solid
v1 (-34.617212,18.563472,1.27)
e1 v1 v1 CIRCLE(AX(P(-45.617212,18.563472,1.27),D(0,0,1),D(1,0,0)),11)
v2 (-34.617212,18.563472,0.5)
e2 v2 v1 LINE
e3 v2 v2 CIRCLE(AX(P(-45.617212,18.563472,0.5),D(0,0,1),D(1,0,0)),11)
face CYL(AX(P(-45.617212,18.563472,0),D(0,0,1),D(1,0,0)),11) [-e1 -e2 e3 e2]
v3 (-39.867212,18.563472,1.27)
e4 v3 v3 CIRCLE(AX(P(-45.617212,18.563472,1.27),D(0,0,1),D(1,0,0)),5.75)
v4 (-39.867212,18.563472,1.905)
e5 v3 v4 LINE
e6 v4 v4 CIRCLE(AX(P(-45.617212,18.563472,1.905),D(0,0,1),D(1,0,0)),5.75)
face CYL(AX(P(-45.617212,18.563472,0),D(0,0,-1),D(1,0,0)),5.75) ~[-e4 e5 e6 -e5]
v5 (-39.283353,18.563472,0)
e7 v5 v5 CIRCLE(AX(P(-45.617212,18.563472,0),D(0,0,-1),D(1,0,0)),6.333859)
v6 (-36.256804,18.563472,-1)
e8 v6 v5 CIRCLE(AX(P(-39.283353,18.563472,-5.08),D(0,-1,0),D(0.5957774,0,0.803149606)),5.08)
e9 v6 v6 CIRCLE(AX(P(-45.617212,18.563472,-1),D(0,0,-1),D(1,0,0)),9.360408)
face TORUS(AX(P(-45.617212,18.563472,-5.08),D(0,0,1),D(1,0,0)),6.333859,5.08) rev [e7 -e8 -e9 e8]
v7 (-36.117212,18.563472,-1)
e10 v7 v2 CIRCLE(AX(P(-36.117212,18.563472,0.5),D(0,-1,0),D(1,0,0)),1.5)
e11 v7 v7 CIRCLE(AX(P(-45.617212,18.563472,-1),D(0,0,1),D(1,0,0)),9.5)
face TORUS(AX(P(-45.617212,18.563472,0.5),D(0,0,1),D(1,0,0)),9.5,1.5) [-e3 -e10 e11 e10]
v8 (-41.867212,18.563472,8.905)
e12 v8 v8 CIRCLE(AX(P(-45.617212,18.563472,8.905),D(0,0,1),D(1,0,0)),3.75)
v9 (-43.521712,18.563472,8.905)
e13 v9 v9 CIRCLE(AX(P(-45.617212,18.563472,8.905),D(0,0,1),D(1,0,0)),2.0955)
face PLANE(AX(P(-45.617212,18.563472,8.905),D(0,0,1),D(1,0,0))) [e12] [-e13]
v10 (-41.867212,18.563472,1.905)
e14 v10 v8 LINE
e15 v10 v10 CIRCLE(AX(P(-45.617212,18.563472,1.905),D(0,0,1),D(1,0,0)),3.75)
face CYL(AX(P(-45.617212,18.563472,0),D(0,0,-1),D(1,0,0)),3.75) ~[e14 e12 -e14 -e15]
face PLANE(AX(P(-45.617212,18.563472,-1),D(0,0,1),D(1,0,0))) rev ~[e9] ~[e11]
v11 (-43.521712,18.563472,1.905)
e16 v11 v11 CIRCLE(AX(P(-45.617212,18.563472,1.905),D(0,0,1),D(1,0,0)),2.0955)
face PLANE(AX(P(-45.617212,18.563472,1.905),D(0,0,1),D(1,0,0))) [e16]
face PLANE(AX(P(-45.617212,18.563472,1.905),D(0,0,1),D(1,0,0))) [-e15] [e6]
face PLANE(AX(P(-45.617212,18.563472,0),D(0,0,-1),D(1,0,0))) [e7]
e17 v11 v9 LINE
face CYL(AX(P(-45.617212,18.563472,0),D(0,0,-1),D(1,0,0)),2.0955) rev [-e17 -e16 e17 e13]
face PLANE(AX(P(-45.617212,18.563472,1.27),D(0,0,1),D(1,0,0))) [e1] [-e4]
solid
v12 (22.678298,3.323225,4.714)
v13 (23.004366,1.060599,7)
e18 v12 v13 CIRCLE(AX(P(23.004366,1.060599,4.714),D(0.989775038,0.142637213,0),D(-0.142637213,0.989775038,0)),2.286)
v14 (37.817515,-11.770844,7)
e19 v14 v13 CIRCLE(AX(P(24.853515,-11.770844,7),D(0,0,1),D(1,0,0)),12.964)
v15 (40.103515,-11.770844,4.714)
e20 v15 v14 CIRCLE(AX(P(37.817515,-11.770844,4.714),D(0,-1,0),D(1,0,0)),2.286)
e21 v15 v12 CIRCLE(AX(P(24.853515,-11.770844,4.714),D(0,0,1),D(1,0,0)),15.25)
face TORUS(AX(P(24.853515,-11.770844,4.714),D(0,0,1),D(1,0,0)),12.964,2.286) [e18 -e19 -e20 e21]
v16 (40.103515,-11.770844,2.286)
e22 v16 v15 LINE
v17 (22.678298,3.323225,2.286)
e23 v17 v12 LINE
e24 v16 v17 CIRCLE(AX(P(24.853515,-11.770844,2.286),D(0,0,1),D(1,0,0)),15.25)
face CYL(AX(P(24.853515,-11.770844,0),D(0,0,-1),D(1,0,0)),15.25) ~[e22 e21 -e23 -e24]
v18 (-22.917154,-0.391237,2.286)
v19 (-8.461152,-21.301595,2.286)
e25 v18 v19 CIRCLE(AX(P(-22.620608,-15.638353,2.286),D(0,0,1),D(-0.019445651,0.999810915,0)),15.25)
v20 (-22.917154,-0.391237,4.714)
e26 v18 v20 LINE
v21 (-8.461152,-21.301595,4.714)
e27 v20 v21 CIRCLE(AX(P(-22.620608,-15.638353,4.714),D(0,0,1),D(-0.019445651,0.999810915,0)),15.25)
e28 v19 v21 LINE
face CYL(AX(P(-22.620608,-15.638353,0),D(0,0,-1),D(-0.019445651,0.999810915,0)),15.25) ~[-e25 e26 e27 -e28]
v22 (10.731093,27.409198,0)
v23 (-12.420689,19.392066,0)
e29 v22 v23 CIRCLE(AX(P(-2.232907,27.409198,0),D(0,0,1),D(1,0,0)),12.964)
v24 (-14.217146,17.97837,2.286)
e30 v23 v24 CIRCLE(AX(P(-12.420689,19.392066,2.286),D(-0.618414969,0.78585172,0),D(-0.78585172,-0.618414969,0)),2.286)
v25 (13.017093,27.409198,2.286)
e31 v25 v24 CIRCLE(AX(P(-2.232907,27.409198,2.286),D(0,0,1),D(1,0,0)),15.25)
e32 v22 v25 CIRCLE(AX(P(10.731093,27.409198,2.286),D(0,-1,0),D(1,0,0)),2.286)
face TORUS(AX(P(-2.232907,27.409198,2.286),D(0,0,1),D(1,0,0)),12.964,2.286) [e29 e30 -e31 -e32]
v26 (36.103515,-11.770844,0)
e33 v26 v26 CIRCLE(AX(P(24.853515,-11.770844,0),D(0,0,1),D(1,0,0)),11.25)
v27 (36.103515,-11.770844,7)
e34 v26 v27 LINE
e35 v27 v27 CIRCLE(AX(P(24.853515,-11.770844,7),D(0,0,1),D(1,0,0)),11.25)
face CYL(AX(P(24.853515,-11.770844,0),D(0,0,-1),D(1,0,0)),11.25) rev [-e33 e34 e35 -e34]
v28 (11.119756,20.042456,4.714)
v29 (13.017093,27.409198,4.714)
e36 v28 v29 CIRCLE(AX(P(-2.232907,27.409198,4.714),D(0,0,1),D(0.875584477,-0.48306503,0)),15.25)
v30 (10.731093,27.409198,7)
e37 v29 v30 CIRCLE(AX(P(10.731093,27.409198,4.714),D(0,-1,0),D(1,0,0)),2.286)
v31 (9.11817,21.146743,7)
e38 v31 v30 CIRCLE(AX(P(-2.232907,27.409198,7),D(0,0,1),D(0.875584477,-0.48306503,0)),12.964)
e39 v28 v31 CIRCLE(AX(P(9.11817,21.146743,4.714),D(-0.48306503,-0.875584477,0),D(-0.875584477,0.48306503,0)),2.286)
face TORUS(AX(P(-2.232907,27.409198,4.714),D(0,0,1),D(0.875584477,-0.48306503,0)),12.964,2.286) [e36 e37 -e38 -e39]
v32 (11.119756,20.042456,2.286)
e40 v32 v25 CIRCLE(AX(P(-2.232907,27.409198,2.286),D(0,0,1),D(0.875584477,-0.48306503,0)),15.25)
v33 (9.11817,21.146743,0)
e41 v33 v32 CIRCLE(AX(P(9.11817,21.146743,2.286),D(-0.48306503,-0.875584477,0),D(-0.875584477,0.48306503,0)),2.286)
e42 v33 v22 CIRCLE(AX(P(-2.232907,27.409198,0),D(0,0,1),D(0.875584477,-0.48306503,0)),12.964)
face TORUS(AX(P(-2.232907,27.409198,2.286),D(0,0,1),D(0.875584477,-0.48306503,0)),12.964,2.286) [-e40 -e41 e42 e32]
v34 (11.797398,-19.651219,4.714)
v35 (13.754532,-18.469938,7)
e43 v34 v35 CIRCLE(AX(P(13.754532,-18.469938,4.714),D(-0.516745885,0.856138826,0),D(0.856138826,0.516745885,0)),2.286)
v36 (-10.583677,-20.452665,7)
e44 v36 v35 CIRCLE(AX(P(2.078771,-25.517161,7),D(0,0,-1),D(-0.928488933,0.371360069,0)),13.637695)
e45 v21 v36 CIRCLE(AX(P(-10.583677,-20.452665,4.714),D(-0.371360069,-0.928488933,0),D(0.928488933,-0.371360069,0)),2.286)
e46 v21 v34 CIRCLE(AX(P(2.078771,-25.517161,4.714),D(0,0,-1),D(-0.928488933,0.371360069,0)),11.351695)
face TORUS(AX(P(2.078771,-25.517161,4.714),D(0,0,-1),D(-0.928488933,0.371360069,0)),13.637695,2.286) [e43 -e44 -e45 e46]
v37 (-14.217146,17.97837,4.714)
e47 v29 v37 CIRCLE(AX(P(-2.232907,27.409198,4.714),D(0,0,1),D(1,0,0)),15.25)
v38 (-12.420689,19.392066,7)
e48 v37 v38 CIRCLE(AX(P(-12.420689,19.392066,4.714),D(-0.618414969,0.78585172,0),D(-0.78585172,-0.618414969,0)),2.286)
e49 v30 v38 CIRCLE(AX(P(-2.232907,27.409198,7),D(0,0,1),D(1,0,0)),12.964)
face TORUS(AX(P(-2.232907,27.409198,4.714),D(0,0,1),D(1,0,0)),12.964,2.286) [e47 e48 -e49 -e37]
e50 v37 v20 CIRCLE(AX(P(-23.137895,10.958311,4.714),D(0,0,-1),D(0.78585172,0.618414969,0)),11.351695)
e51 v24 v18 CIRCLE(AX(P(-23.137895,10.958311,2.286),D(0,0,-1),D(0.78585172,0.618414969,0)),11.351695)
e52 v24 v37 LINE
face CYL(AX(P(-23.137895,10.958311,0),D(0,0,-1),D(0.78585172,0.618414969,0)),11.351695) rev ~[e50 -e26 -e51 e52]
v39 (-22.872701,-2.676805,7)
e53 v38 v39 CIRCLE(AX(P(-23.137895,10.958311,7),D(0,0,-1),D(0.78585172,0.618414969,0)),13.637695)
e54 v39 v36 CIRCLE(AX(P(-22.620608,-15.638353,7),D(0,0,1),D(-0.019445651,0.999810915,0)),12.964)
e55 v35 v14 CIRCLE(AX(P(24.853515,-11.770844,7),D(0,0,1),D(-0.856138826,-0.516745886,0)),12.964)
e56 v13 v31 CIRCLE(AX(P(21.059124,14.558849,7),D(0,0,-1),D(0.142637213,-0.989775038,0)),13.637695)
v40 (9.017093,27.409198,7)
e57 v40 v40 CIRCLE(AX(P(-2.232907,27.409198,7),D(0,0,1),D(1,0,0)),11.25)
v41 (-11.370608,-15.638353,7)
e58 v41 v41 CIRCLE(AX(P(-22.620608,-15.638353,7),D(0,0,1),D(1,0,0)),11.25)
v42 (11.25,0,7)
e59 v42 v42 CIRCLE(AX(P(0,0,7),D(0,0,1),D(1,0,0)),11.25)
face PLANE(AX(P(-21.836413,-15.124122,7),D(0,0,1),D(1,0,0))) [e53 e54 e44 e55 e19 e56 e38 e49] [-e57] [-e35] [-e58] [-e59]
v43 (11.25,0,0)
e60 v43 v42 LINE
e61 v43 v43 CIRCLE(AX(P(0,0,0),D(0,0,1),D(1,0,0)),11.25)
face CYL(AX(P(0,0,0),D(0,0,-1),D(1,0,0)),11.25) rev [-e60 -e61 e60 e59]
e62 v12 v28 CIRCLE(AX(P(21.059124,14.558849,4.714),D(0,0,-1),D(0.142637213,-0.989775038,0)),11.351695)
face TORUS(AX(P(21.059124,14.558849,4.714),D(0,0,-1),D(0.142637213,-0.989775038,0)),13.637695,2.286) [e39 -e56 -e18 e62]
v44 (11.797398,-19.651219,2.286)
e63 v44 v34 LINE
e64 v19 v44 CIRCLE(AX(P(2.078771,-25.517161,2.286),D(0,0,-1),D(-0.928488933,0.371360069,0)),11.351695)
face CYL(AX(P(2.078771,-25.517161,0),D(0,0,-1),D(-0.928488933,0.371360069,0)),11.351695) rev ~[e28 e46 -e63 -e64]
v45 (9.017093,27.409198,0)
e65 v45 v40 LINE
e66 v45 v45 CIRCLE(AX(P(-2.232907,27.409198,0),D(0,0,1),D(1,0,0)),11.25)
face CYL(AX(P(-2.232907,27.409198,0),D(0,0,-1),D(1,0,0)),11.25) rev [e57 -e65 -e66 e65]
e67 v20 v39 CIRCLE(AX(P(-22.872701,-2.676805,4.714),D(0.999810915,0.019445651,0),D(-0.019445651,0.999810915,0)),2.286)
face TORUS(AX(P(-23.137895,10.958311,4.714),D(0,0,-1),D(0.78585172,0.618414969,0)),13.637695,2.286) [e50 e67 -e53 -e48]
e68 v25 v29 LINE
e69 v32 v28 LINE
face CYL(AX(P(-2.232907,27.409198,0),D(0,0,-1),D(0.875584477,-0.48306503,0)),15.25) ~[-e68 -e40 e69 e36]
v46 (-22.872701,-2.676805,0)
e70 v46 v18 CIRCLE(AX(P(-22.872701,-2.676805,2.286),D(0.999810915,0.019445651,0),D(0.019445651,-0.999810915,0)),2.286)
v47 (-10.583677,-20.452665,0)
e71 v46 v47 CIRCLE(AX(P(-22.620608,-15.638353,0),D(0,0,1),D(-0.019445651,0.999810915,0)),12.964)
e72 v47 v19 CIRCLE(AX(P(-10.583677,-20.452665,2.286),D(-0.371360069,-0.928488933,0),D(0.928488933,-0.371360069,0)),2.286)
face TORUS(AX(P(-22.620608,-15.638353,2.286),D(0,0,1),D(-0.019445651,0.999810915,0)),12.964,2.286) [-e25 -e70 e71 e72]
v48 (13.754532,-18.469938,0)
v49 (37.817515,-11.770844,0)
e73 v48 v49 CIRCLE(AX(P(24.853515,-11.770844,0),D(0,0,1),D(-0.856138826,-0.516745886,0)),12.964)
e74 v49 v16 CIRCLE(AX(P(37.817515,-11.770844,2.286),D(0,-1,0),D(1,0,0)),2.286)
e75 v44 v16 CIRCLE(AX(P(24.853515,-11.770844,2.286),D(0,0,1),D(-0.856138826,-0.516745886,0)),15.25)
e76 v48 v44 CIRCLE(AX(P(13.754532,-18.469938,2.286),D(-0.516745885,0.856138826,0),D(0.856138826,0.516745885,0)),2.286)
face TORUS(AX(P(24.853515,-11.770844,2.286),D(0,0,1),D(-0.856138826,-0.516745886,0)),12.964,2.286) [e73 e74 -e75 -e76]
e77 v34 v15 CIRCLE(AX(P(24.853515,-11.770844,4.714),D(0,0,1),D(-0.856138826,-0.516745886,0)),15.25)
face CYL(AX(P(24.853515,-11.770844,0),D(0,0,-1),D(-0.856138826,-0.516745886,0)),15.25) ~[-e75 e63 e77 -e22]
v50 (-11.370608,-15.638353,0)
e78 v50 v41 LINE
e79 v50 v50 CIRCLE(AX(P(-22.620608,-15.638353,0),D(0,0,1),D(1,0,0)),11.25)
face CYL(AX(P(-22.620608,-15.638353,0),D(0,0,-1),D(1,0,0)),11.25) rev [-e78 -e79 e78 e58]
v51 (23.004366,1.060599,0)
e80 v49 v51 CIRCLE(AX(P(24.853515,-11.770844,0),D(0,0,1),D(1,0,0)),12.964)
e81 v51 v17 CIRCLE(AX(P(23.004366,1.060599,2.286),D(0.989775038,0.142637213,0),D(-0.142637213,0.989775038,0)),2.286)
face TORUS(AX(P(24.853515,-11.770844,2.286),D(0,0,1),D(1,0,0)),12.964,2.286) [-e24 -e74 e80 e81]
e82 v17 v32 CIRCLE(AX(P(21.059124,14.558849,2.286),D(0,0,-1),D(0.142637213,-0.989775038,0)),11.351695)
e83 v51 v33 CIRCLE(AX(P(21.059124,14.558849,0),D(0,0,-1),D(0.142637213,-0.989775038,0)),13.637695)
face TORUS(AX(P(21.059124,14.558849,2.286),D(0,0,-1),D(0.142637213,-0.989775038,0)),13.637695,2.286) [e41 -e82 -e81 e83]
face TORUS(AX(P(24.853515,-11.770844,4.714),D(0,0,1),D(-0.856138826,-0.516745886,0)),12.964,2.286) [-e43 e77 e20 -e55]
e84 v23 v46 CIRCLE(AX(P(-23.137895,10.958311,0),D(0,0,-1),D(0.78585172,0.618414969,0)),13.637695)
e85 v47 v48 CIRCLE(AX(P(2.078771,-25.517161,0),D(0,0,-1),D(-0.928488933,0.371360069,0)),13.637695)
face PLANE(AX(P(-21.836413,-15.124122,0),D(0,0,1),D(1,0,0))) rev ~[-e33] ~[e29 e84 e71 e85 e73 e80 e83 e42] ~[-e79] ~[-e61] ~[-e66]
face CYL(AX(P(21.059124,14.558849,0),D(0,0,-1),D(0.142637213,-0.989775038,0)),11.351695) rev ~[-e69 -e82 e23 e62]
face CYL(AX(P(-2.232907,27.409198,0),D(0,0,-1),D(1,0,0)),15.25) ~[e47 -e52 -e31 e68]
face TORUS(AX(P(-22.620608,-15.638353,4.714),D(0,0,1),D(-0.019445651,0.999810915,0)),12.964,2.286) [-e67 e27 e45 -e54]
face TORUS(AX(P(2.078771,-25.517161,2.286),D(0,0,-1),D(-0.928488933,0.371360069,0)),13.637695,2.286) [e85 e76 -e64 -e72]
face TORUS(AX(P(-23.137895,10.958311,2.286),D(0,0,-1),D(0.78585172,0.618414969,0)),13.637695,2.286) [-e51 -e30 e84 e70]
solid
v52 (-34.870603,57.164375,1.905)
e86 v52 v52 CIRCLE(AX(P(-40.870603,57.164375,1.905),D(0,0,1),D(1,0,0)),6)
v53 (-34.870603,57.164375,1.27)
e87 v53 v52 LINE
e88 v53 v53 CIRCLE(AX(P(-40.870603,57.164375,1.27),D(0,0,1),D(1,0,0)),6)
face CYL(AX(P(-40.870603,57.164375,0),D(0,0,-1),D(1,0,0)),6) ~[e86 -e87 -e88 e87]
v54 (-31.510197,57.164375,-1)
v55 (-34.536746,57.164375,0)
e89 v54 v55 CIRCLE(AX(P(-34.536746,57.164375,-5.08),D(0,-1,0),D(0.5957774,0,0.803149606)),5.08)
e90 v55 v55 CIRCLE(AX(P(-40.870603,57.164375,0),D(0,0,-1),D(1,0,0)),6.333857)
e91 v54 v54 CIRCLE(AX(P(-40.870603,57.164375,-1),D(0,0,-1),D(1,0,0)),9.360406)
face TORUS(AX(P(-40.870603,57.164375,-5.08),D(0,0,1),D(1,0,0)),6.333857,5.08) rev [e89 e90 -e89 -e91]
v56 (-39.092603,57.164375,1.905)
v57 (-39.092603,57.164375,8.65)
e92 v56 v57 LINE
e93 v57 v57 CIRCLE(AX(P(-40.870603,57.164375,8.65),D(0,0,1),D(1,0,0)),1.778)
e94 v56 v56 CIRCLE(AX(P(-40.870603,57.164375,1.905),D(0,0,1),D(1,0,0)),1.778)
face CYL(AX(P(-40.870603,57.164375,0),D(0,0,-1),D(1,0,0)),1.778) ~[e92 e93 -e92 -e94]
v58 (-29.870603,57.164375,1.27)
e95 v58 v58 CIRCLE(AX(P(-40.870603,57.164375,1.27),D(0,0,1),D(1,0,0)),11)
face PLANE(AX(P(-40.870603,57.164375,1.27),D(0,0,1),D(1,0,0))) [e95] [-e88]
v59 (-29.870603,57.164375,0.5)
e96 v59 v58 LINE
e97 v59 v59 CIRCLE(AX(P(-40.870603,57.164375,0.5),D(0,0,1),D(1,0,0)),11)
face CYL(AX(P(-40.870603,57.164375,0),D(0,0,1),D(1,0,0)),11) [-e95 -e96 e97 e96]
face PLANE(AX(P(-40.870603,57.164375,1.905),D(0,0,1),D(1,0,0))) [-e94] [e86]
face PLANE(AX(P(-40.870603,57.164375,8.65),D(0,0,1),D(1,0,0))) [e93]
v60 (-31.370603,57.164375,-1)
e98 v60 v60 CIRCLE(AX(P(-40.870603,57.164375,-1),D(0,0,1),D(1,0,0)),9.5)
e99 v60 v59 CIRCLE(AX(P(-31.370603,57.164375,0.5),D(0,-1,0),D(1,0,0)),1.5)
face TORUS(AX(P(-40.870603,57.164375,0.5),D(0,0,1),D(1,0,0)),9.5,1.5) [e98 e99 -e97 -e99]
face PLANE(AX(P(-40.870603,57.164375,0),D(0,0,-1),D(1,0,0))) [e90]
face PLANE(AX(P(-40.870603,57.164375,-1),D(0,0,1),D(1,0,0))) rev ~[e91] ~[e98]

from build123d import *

# Parameters (mm, degrees)
F0_R      = 11.25
F1_DEPTH  = 7
F2_R      = 2.286
F3_R      = 2.286
F4_R      = 11
F4_R_2    = 5.75
F5_DEPTH  = 1.27
F4_R_3    = 3.75
F6_DEPTH  = 1.905
F4_R_4    = 2.0955
F7_DEPTH  = 8.905
F8_R      = 11
F8_R_2    = 6
F9_DEPTH  = 1.27
F8_R_3    = 1.778
F10_DEPTH = 1.905
F11_DEPTH = 8.65
F12_DEPTH = 1
F13_R     = 9.3604062529
F13_R_2   = 1.778
F14_DEPTH = 1
F16_R     = 1.5
F17_DEPTH = 1
F18_R     = 9.360408
F19_DEPTH = 1
F21_R     = 1.5


# Not quite as in the source:
# - a fillet or chamfer that OpenCascade refuses, or shapes differently, is made with other operations: its cross-section is extruded or revolved along the edge and cut away or added


with BuildPart() as f1:
    # F0 (on Top) → F1 (new body)
    with BuildSketch(Plane.XY):
        with BuildLine():
            ThreePointArc((-8.4611516462, -21.3015945231), (-7.6457254486, -18.5219963455), (-7.3706078777, -15.6383534697))
            ThreePointArc((-7.3706078777, -15.6383534697), (-11.9425890824, -4.7506349481), (-22.9171540556, -0.3912370091))
            ThreePointArc((-22.9171540556, -0.3912370091), (-35.1647631553, -24.310531303), (-8.4611516462, -21.3015945231))
        make_face()
        with Locations((-22.6206078777, -15.6383534697)):
            Circle(F0_R, mode=Mode.SUBTRACT)
        with BuildLine():
            ThreePointArc((-22.9171540556, -0.3912370091), (-11.9425890824, -4.7506349481), (-7.3706078777, -15.6383534697))
            ThreePointArc((-7.3706078777, -15.6383534697), (-7.6457254486, -18.5219963455), (-8.4611516462, -21.3015945231))
            ThreePointArc((-8.4611516462, -21.3015945231), (1.1570520367, -14.202947954), (11.7973982166, -19.6512190901))
            ThreePointArc((11.7973982166, -19.6512190901), (11.0711113685, -5.2433761134), (22.6782978212, 3.3232249907))
            ThreePointArc((22.6782978212, 3.3232249907), (11.7215877184, 8.1035104343), (11.119755839, 20.0424560992))
            ThreePointArc((11.119755839, 20.0424560992), (-0.9946587684, 12.2095517499), (-14.217146175, 17.9783695324))
            ThreePointArc((-14.217146175, 17.9783695324), (-12.8786397552, 6.0994375197), (-22.9171540556, -0.3912370091))
        make_face()
        Circle(F0_R, mode=Mode.SUBTRACT)
        with BuildLine():
            ThreePointArc((13.0170925607, 27.409197806), (-7.223040668, 41.8196478461), (-14.217146175, 17.9783695324))
            ThreePointArc((-14.217146175, 17.9783695324), (-0.9946587684, 12.2095517499), (11.119755839, 20.0424560992))
            ThreePointArc((11.119755839, 20.0424560992), (12.5351427873, 23.605621528), (13.0170925607, 27.409197806))
        make_face()
        with Locations((-2.2329074393, 27.409197806)):
            Circle(F0_R, mode=Mode.SUBTRACT)
        with BuildLine():
            ThreePointArc((22.6782978212, 3.3232249907), (11.0711113685, -5.2433761134), (11.7973982166, -19.6512190901))
            ThreePointArc((11.7973982166, -19.6512190901), (28.9435467483, -26.4621391359), (40.103515317, -11.7708443362))
            ThreePointArc((40.103515317, -11.7708443362), (34.8382645174, -0.2440371718), (22.6782978212, 3.3232249907))
        make_face()
        with Locations((24.853515317, -11.7708443362)):
            Circle(F0_R, mode=Mode.SUBTRACT)
    extrude(amount=F1_DEPTH)

    # F2
    f2_edges = [f1.edges().sort_by_distance(p)[0] for p in [
        (-35.164763, -24.310531, 7),
    ]]
    fillet(f2_edges, radius=F2_R)

    # F3
    f3_edges = [f1.edges().sort_by_distance(p)[0] for p in [
        (-3.471156, 42.608844, 0),
        (-35.164763, -24.310531, 0),
        (-12.87864, 6.099438, 0),
        (1.157052, -14.202948, 0),
        (38.635919, -18.298313, 0),
        (11.721588, 8.10351, 0),
    ]]
    fillet(f3_edges, radius=F3_R)


with BuildPart() as f5:
    # F4 (on Top) → F5 (new body)
    with BuildSketch(Plane.XY):
        with Locations((-45.6172116101, 18.5634717345)):
            Circle(F4_R)
        with Locations((-45.6172116101, 18.5634717345)):
            Circle(F4_R_2, mode=Mode.SUBTRACT)
    extrude(amount=F5_DEPTH)

    # F4 (on Top) → F6 (join)
    with BuildSketch(Plane.XY):
        with Locations((-45.6172116101, 18.5634717345)):
            Circle(F4_R_2)
        with Locations((-45.6172116101, 18.5634717345)):
            Circle(F4_R_3, mode=Mode.SUBTRACT)
    extrude(amount=F6_DEPTH)



with BuildPart() as f6:
    # F4 (on Top) → F6, piece 2 (new body)
    with BuildSketch(Plane.XY):
        with Locations((-45.6172116101, 18.5634717345)):
            Circle(F4_R_4)
    extrude(amount=F6_DEPTH)


with BuildPart() as f5_1:
    add(f5.part)

    add(f6.part)  # F7 merges F6
    # F4 (on Top) → F7 (join)
    with BuildSketch(Plane.XY):
        with Locations((-45.6172116101, 18.5634717345)):
            Circle(F4_R_3)
        with Locations((-45.6172116101, 18.5634717345)):
            Circle(F4_R_4, mode=Mode.SUBTRACT)
    extrude(amount=F7_DEPTH)

    # F4 (on Top) → F17 (join)
    with BuildSketch(Plane.XY):
        with Locations((-45.6172116101, 18.5634717345)):
            Circle(F4_R)
        with Locations((-45.6172116101, 18.5634717345)):
            Circle(F4_R_2, mode=Mode.SUBTRACT)
        with Locations((-45.6172116101, 18.5634717345)):
            Circle(F4_R_2)
        with Locations((-45.6172116101, 18.5634717345)):
            Circle(F4_R_3, mode=Mode.SUBTRACT)
        with Locations((-45.6172116101, 18.5634717345)):
            Circle(F4_R_3)
        with Locations((-45.6172116101, 18.5634717345)):
            Circle(F4_R_4, mode=Mode.SUBTRACT)
        with Locations((-45.6172116101, 18.5634717345)):
            Circle(F4_R_4)
    extrude(amount=-F17_DEPTH)

    # F18 (on face) → F19 (cut)
    with BuildSketch(Plane(origin=(0, 0, -1), x_dir=(1, 0, 0), z_dir=(0, 0, -1))):
        with Locations((-45.6172116101, -18.5634717345)):
            Circle(F18_R)
    extrude(amount=-F19_DEPTH, mode=Mode.SUBTRACT)

    # F20: fillet of radius 5.08 on 1 edges, made by hand

    # F20_s1 → F20_t2 (revolve)
    with BuildSketch(Plane.XZ.offset(-18.5634717345)):
        with BuildLine():
            ThreePointArc((-36.2568036101, -1), (-37.6896150551, -0.2564743185), (-39.2833528002, 0))
            Line((-39.2833528002, 0), (-36.2568036101, 0))
            Line((-36.2568036101, 0), (-36.2568036101, -1))
        make_face()
    revolve(axis=Axis((-45.6172116101, 18.5634717345, 0), (0, 0, -1)))

    # F21
    f21_edges = [f5_1.edges().sort_by_distance(p)[0] for p in [
        (-56.617212, 18.563472, -1),
    ]]
    fillet(f21_edges, radius=F21_R)


with BuildPart() as f9:
    # F8 (on Top) → F9 (new body)
    with BuildSketch(Plane.XY):
        with Locations((-40.870603174, 57.1643747389)):
            Circle(F8_R)
        with Locations((-40.870603174, 57.1643747389)):
            Circle(F8_R_2, mode=Mode.SUBTRACT)
    extrude(amount=F9_DEPTH)

    # F8 (on Top) → F10 (join)
    with BuildSketch(Plane.XY):
        with Locations((-40.870603174, 57.1643747389)):
            Circle(F8_R_2)
        with Locations((-40.870603174, 57.1643747389)):
            Circle(F8_R_3, mode=Mode.SUBTRACT)
    extrude(amount=F10_DEPTH)

    # F8 (on Top) → F11 (join)
    with BuildSketch(Plane.XY):
        with Locations((-40.870603174, 57.1643747389)):
            Circle(F8_R_3)
    extrude(amount=F11_DEPTH)

    # F8 (on Top) → F12 (join)
    with BuildSketch(Plane.XY):
        with Locations((-40.870603174, 57.1643747389)):
            Circle(F8_R)
        with Locations((-40.870603174, 57.1643747389)):
            Circle(F8_R_2, mode=Mode.SUBTRACT)
        with Locations((-40.870603174, 57.1643747389)):
            Circle(F8_R_2)
        with Locations((-40.870603174, 57.1643747389)):
            Circle(F8_R_3, mode=Mode.SUBTRACT)
    extrude(amount=-F12_DEPTH)

    # F13 (on face) → F14 (cut)
    with BuildSketch(Plane(origin=(0, 0, -1), x_dir=(1, 0, 0), z_dir=(0, 0, -1))):
        with Locations((-40.870603174, -57.1643747389)):
            Circle(F13_R)
        with Locations((-40.870603174, -57.1643747389)):
            Circle(F13_R_2, mode=Mode.SUBTRACT)
    extrude(amount=-F14_DEPTH, mode=Mode.SUBTRACT)

    # F15: fillet of radius 5.08 on 1 edges, made by hand

    # F15_s1 → F15_t2 (revolve)
    with BuildSketch(Plane.XZ.offset(-57.1643747389)):
        with BuildLine():
            ThreePointArc((-31.510196921, -1), (-32.9430083661, -0.2564743185), (-34.5367461111, 0))
            Line((-34.5367461111, 0), (-31.510196921, 0))
            Line((-31.510196921, 0), (-31.510196921, -1))
        make_face()
    revolve(axis=Axis((-40.870603174, 57.1643747389, 0), (0, 0, -1)))

    # F16
    f16_edges = [f9.edges().sort_by_distance(p)[0] for p in [
        (-51.870603, 57.164375, -1),
    ]]
    fillet(f16_edges, radius=F16_R)


solid = Compound([f1.part, f5_1.part, f9.part])
